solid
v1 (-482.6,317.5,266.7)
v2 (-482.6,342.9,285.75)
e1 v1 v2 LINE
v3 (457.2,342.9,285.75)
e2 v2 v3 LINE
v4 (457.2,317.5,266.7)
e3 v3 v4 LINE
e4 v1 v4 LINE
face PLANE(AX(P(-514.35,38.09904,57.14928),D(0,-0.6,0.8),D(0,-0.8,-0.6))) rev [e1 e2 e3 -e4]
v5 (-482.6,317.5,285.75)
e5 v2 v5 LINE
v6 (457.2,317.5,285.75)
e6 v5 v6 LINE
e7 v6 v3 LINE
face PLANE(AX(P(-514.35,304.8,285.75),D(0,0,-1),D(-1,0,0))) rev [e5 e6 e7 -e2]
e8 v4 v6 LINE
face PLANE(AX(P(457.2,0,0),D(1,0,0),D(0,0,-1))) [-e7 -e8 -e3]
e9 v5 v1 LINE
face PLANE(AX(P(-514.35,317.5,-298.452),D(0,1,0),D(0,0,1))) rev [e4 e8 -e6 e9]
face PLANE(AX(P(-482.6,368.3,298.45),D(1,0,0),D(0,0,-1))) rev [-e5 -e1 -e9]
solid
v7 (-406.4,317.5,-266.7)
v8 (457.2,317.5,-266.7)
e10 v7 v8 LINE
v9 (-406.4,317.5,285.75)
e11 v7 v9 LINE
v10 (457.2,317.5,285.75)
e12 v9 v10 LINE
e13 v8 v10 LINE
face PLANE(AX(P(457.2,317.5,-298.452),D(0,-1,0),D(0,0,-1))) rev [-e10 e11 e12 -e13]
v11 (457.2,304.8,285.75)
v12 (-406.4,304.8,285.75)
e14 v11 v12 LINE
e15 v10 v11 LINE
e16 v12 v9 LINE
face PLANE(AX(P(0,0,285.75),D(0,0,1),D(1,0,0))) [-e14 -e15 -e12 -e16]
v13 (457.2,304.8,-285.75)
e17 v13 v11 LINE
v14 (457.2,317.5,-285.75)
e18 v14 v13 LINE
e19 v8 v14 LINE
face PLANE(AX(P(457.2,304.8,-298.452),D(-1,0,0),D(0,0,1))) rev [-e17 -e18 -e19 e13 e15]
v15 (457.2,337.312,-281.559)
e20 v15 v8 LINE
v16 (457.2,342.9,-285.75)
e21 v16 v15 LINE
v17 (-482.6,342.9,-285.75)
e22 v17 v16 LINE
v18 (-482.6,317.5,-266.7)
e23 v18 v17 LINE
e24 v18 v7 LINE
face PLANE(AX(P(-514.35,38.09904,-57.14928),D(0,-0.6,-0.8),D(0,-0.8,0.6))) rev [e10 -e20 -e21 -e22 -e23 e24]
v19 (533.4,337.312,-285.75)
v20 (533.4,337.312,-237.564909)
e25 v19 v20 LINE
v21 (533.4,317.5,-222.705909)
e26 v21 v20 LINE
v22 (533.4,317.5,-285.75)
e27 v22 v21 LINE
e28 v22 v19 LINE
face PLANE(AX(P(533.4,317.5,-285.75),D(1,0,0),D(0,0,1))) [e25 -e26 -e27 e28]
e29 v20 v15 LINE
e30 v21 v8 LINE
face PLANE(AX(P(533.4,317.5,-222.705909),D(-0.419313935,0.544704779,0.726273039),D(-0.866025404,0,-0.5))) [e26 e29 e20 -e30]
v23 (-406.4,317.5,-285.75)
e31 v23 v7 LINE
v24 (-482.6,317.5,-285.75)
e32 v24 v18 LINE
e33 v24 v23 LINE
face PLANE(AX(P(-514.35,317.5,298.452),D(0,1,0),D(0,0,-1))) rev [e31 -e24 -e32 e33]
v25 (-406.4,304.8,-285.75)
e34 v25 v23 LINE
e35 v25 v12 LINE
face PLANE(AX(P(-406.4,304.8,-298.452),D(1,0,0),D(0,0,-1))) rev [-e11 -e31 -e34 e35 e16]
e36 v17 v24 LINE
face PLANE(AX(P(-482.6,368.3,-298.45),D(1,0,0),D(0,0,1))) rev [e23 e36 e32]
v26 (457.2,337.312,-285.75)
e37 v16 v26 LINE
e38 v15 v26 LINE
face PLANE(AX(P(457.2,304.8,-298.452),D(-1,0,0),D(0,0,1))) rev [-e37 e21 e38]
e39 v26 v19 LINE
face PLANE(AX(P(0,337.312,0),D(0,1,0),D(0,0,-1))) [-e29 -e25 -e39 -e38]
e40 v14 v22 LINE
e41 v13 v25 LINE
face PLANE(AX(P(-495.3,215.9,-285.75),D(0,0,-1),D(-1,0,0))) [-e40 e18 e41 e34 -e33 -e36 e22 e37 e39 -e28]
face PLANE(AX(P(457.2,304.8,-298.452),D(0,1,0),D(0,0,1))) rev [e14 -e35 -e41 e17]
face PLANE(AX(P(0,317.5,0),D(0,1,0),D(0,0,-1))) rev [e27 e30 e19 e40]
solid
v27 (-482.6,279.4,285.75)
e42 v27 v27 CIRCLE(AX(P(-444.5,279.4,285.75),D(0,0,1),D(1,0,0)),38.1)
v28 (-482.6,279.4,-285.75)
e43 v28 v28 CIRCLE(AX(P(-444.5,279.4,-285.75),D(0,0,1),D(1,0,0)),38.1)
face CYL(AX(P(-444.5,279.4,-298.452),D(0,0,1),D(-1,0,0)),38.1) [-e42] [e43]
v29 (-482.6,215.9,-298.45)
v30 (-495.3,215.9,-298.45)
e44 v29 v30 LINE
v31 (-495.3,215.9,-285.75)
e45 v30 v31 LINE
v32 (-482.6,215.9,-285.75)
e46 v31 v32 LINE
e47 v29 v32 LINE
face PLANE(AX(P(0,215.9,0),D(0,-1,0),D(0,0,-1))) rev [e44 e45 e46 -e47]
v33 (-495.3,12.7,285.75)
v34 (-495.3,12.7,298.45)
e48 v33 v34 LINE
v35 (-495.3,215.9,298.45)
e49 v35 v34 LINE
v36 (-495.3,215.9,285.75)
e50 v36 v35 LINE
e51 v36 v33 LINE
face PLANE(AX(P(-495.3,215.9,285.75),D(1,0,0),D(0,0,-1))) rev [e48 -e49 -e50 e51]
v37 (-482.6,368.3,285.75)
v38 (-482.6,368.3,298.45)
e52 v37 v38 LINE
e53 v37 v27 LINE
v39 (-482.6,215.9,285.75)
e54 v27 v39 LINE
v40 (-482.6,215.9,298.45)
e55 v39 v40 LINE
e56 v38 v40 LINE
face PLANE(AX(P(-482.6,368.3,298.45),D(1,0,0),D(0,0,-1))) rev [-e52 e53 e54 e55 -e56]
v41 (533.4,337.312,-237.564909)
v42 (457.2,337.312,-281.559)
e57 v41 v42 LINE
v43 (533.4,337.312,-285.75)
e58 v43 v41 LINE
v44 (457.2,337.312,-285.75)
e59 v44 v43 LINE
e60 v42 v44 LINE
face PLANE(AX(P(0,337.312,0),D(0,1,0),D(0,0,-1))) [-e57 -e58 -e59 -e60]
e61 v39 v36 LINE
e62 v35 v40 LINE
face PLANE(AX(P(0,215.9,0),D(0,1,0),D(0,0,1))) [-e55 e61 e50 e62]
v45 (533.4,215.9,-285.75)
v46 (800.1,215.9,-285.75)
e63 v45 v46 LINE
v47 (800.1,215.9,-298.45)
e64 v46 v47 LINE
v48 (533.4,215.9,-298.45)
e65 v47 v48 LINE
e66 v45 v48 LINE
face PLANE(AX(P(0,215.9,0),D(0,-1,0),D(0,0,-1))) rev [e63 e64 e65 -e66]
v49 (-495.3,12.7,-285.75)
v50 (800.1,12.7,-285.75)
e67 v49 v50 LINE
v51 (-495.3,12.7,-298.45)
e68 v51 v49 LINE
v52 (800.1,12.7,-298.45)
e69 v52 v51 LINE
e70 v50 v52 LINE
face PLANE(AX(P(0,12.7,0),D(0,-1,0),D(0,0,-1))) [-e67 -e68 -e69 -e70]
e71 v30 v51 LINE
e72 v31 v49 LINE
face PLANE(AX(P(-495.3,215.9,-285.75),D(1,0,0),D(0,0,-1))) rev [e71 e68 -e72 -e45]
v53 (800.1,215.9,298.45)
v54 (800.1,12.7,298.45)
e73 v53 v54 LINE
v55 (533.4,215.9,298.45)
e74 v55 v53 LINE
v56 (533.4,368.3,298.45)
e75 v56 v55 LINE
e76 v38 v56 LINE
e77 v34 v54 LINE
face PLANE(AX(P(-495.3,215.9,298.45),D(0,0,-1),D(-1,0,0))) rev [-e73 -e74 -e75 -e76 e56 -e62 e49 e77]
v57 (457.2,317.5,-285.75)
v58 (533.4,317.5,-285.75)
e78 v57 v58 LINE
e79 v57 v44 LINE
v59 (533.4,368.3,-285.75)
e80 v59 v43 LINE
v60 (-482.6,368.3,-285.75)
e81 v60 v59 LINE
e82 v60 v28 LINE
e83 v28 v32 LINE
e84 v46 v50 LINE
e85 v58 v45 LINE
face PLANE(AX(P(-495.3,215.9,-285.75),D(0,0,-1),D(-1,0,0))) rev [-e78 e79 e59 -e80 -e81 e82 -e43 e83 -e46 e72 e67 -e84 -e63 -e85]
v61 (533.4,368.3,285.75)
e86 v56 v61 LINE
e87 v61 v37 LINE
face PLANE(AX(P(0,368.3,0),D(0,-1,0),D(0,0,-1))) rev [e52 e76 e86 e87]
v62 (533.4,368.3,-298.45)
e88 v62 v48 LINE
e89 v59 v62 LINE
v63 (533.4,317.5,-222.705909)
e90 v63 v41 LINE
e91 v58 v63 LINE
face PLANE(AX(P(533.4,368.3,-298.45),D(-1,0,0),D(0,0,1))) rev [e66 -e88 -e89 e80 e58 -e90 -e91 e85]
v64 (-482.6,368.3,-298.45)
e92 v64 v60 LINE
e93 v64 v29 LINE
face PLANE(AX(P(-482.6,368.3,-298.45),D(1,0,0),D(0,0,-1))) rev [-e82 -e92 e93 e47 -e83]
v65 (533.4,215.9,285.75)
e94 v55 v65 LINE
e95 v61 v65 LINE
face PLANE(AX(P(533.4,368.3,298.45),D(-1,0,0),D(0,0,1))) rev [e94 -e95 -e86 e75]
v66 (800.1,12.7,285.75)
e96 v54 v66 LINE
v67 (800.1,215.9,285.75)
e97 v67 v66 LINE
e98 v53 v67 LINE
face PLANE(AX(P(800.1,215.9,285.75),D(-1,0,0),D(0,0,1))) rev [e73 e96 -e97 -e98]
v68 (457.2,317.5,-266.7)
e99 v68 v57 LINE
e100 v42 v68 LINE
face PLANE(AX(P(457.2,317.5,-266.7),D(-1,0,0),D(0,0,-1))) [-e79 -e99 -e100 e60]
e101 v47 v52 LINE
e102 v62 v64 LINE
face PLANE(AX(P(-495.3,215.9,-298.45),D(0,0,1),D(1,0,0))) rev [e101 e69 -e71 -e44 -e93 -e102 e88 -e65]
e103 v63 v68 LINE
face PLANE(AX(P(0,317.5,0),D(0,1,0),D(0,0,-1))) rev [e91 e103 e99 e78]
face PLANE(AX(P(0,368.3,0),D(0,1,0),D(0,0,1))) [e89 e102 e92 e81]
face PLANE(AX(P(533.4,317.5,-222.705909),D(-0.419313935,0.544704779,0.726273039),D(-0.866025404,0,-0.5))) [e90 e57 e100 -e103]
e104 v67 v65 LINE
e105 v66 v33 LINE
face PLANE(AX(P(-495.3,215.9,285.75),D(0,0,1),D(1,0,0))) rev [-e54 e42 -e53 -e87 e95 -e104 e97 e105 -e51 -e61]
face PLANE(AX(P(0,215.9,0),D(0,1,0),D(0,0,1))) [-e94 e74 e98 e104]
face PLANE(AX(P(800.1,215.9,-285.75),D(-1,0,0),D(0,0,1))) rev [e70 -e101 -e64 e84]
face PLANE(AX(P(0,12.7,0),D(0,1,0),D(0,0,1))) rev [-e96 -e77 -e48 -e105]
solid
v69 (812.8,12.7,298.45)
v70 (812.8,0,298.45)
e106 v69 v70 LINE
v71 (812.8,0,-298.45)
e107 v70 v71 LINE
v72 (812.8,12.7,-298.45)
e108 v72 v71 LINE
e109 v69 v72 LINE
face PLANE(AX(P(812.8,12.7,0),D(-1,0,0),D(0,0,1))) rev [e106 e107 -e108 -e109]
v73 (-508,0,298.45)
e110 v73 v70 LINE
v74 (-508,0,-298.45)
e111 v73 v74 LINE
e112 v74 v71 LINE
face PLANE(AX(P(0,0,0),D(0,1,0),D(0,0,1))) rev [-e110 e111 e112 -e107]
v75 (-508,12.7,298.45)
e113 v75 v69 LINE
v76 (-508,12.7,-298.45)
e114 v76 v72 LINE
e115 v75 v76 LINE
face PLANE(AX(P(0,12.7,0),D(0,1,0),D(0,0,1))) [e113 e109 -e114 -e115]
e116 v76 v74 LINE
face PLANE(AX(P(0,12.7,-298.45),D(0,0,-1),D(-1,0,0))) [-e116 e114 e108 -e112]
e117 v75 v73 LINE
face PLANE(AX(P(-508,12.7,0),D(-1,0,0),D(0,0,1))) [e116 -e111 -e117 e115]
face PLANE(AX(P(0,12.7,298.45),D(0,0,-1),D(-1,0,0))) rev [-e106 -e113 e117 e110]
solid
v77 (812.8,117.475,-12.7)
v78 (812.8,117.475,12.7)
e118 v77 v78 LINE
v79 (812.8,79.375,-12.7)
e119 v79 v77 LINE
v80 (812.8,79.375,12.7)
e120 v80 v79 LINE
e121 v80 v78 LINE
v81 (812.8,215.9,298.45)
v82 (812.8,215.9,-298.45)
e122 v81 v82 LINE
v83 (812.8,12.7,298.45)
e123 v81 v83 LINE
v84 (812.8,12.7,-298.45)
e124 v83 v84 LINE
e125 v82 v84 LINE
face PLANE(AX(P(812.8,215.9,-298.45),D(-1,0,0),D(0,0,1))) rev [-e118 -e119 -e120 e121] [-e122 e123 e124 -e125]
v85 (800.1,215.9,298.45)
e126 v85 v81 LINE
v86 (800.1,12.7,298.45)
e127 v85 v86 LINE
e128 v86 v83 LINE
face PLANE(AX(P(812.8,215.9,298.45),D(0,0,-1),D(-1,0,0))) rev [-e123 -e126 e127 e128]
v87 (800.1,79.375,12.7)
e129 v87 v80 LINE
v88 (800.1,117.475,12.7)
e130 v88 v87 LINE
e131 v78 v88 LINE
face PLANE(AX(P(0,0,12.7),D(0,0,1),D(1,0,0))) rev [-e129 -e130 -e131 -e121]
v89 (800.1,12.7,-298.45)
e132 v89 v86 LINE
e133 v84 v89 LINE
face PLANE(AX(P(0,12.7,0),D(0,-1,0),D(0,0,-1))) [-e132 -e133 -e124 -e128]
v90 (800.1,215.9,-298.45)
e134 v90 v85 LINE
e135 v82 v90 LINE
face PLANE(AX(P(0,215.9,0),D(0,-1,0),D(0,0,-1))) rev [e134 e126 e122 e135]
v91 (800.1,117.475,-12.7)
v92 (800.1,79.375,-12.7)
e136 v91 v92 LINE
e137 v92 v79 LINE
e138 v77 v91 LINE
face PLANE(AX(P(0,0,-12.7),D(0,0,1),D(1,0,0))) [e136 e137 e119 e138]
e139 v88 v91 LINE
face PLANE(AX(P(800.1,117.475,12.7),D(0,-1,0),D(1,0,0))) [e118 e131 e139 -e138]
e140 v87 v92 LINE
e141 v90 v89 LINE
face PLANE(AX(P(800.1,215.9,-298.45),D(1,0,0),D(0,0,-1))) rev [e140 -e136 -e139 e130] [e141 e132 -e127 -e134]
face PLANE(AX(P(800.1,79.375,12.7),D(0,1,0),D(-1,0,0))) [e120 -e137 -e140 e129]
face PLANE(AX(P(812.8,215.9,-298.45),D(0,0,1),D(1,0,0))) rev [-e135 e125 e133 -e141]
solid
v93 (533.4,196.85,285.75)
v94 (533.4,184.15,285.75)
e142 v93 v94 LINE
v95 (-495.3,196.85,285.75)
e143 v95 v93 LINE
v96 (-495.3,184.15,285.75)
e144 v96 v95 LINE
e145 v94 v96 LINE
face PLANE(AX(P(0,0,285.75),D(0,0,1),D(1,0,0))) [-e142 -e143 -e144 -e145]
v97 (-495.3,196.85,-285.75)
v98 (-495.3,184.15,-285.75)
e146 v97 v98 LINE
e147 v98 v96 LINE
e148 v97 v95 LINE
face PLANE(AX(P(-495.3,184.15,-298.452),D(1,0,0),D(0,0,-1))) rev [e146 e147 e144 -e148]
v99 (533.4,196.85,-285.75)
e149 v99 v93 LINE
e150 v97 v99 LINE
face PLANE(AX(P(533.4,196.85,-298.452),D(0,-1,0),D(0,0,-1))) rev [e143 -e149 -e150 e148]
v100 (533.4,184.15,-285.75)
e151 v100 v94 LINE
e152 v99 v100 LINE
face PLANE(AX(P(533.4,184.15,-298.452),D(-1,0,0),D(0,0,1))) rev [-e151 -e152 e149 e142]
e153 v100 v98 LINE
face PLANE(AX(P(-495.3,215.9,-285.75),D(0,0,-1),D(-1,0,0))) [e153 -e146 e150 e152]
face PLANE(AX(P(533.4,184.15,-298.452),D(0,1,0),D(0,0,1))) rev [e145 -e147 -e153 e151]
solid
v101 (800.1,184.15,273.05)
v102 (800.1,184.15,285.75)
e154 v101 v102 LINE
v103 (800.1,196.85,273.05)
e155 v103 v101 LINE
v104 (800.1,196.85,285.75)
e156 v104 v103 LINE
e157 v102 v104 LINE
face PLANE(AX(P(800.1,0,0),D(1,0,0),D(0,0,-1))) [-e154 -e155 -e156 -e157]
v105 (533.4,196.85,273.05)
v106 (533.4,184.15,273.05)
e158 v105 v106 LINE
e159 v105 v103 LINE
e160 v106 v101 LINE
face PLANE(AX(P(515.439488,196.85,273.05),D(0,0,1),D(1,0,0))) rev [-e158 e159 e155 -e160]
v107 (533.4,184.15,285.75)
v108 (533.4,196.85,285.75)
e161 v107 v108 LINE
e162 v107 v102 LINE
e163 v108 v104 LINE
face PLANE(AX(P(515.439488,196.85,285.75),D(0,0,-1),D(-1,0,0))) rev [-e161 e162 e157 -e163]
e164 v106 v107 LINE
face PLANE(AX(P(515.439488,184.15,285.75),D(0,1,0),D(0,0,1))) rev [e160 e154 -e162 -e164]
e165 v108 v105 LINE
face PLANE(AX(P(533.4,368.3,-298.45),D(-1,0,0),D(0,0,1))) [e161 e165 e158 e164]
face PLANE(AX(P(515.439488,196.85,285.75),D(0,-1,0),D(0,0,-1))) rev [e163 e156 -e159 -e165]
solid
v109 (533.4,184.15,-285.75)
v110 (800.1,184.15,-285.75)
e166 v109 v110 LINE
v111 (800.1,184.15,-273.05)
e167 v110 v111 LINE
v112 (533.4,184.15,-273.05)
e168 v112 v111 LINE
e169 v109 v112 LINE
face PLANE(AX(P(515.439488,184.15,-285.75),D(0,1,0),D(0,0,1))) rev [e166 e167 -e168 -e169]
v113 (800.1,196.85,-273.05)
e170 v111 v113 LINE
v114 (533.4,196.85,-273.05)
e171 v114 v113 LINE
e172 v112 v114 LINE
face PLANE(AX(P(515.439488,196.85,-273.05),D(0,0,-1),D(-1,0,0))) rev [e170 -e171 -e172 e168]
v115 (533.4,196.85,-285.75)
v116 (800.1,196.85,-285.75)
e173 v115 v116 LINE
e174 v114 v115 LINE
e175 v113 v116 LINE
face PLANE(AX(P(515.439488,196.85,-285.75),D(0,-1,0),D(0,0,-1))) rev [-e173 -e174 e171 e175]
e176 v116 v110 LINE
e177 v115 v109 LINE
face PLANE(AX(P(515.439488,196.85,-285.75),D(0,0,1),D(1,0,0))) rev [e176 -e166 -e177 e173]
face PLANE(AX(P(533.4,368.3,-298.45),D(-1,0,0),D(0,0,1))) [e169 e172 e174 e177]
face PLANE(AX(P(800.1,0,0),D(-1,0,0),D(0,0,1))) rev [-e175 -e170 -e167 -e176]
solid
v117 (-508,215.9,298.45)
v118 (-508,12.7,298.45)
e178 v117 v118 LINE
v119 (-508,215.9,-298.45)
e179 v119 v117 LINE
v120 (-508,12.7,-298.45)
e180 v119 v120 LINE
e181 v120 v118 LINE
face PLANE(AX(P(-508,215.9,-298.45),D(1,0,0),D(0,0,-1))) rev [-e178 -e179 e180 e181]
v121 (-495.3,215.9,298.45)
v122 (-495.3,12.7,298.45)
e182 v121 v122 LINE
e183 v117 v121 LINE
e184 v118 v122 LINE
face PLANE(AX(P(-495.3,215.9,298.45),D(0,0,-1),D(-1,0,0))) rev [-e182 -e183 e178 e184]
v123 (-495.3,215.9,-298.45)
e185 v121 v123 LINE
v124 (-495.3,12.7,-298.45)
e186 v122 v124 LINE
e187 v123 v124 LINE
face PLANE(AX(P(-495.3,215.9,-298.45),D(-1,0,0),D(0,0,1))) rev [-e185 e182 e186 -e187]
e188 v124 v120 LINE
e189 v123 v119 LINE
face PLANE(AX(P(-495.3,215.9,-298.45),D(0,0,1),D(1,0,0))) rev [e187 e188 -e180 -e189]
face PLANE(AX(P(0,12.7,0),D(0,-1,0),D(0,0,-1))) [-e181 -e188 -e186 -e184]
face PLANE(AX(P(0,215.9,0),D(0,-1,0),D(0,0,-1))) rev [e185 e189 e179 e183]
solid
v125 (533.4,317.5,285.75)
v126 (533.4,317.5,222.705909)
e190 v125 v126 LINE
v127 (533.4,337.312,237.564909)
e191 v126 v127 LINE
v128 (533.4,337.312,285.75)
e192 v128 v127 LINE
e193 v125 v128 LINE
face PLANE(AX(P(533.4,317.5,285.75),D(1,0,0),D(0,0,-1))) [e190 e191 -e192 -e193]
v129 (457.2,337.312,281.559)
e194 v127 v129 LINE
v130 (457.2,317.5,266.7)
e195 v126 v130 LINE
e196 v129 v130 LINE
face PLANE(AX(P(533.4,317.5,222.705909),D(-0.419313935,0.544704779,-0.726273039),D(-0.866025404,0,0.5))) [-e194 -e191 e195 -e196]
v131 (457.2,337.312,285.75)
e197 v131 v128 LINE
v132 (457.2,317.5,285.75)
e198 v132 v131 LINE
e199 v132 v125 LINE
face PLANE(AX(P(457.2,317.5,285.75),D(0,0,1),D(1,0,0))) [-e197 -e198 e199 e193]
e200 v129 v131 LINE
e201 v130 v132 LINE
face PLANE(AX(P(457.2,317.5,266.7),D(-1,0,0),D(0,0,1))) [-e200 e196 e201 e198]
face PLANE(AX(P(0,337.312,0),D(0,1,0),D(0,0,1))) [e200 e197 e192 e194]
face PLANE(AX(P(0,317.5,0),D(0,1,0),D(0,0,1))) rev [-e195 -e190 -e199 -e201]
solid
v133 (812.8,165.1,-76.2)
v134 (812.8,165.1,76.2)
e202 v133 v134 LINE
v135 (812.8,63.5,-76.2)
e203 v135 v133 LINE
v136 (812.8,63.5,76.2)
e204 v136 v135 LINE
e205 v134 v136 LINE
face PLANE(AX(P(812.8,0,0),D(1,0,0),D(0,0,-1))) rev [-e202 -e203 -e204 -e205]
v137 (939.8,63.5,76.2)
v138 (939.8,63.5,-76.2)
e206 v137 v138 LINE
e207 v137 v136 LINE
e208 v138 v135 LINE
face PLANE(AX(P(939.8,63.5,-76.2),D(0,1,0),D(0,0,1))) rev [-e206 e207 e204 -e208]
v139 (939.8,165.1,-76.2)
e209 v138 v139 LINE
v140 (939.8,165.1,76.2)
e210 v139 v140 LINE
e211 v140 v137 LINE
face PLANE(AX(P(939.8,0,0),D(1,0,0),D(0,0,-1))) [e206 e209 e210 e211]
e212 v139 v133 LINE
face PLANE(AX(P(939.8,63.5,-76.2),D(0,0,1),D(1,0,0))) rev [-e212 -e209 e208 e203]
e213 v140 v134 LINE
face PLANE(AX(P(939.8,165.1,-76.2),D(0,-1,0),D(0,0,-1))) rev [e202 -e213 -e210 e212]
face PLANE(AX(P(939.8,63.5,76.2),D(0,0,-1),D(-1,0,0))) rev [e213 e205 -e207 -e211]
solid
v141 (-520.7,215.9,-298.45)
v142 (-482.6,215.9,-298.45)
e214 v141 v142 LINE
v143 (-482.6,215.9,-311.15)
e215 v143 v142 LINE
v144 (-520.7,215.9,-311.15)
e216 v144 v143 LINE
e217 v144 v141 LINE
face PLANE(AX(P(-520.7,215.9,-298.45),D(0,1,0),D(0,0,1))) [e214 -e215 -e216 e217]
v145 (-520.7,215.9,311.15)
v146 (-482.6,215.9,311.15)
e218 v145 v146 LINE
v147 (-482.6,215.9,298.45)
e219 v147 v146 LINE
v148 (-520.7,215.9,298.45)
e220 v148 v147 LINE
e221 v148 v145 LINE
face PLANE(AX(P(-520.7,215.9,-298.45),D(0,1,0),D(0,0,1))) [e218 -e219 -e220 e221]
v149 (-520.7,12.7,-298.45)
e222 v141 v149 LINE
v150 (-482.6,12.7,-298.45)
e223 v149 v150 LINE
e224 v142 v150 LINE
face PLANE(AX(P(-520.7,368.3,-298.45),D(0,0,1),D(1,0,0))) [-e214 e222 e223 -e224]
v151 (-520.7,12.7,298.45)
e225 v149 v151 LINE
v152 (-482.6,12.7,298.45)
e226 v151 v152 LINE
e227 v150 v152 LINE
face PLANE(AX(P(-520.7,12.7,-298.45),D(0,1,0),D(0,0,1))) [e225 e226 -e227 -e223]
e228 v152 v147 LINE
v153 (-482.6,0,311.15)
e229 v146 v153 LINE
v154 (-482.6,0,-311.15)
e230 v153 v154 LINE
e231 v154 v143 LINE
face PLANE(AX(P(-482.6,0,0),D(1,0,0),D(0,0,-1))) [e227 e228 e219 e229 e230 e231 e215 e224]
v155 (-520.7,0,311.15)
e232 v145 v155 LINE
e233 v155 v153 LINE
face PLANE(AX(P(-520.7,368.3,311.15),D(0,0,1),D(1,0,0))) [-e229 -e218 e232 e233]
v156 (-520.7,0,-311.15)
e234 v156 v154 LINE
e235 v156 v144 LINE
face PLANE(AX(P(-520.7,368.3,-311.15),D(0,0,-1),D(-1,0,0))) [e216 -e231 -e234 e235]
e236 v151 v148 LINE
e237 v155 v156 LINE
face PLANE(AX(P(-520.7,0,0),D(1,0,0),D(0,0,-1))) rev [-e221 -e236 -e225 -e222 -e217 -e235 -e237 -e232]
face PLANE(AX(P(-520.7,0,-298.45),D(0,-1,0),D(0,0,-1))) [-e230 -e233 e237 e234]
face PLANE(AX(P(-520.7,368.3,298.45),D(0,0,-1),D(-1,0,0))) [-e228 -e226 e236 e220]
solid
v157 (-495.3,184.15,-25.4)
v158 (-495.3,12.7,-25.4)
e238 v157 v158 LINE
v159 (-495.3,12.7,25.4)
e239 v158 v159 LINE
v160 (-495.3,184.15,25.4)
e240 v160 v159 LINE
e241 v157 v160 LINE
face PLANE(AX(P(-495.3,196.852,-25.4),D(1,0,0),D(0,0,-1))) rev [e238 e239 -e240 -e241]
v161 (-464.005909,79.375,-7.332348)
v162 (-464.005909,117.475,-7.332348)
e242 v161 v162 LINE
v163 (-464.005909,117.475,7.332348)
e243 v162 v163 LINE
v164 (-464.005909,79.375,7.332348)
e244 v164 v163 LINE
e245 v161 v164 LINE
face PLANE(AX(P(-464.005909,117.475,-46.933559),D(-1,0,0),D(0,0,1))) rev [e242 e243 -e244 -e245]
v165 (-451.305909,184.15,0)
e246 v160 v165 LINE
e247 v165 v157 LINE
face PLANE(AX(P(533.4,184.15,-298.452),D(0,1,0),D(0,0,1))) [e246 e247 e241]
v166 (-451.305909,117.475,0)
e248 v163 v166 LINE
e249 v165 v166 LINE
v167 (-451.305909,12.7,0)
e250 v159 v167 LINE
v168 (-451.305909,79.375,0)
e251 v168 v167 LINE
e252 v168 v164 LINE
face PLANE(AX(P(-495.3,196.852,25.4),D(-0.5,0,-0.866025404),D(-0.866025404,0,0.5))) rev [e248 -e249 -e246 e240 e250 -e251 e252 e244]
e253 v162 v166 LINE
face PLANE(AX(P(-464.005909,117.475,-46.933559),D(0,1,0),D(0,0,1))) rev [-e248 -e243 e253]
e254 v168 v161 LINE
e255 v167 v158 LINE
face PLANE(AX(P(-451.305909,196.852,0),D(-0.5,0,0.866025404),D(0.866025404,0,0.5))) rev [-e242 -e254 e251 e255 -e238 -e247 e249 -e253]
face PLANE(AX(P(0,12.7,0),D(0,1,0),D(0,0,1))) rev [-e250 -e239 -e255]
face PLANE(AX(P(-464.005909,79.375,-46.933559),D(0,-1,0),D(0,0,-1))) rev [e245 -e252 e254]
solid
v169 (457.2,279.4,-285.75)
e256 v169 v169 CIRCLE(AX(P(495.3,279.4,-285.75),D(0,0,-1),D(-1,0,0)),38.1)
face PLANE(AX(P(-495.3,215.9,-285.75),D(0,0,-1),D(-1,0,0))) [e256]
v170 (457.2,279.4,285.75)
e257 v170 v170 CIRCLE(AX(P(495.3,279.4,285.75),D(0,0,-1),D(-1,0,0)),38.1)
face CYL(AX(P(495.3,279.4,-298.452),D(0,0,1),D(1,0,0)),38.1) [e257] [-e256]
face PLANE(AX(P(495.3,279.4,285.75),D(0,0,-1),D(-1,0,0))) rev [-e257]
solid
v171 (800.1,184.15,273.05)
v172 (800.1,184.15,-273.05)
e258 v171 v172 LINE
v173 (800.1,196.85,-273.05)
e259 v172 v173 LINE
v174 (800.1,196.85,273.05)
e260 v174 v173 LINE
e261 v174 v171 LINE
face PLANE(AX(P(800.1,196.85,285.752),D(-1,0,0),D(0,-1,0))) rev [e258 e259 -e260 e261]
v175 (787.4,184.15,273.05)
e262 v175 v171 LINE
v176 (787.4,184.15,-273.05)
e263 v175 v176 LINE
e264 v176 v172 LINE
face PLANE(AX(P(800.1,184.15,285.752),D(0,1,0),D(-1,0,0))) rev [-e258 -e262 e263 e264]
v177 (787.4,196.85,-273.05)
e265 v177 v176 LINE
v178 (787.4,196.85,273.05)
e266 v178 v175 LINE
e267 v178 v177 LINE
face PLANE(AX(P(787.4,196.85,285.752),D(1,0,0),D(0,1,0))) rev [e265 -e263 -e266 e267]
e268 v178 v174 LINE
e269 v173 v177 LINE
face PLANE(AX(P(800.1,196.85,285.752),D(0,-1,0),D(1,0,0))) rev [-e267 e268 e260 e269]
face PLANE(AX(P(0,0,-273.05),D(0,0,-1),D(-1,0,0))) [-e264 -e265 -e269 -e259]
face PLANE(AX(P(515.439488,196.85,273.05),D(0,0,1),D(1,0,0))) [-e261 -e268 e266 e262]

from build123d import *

# Parameters (mm, degrees)
SKETCH1_W                             = 1016
SKETCH1_H                             = 596.9
SKETCH1_W_2                           = 304.8
FOND_DEPTH                            = 12.7
SKETCH2_W                             = 1295.4
SKETCH2_H                             = 12.7
COT_S_HAUT_DEPTH                      = 203.2
COT_S_HAUT_2_DEPTH                    = 203.2
SKETCH3_W                             = 12.7
SKETCH3_H                             = 596.9
COT_ES_BAS_DEPTH                      = 203.2
COT_ES_BAS_2_DEPTH                    = 203.2
SKETCH4_W                             = 1016
SKETCH4_H                             = 12.7
SUPPORT_CAGE_DEPTH                    = 152.4
SKETCH5_W                             = 12.7
SKETCH5_H                             = 12.7
SUPPORT_TRAPPE_COT_ES_DEPTH           = 266.7
SUPPORT_TRAPPE_COT_ES_2_DEPTH         = 266.7
SUPPORT_TRAPPE_DEVANT_REACH           = 1061.67
SKETCH6_W                             = 12.7
SKETCH6_H                             = 12.7
PLANCHER_MILLIEU_REACH                = 1068.573
SKETCH7_W                             = 1028.7
SKETCH7_H                             = 12.7
ROULEAU_REACH                         = 1068.573
SKETCH8_R                             = 38.1
SKETCH10_W                            = 863.6
SKETCH10_H                            = 12.7
SOUTIEN_TAPIS_DEPTH                   = 571.5
REBORD_START                          = -1016
REBORD_TAPIS_DEPTH                    = 939.8
V_POUR_VIS_SANS_FIN_DEPTH             = 171.45
SKETCH14_W                            = 152.4
SKETCH14_H                            = 101.6
MOTEUR_VIS_SANS_FIN_DEPTH             = 127
TROU_V_VIS_SANS_FIN_REACH             = 1054.588
SKETCH17_W                            = 12.7
SKETCH17_H                            = 38.1
TROU_V_VIS_SANS_FIN_DIRECTION_2_REACH = 1054.588
TROU_SORTIE_VIS_SANS_FIN_DEPTH        = 12.7
TROU_SORTIE_VIS_SANS_FIN_DEPTH_BACK   = 12.7
SKETCH18_W                            = 127
SKETCH18_H                            = 38.1
REBORD_START_2                        = -25.4
REBORD_POUR_SAC_POUBELLE_DEPTH        = 38.1


with BuildPart() as part:
    # Sketch1 → Fond (new body)
    with BuildSketch(Plane(origin=(0, 0, 0), x_dir=(1, 0, 0), z_dir=(0, 1, 0))):
        Rectangle(SKETCH1_W, SKETCH1_H)
        with Locations((660.4, 0)):
            Rectangle(SKETCH1_W_2, SKETCH1_H)
    extrude(amount=FOND_DEPTH)


with BuildPart() as body_2:
    # Sketch2 → Cotés Haut (new body)
    with BuildSketch(Plane(origin=(0, 12.7, 0), x_dir=(1, 0, 0), z_dir=(0, 1, 0))):
        with Locations((152.4, 292.1)):
            Rectangle(SKETCH2_W, SKETCH2_H)
    extrude(amount=COT_S_HAUT_DEPTH)



with BuildPart() as body_3:
    # Sketch2 → Cot_s Haut 2 (new body)
    with BuildSketch(Plane(origin=(0, 12.7, 0), x_dir=(1, 0, 0), z_dir=(0, 1, 0))):
        with Locations((152.4, -292.1)):
            Rectangle(SKETCH2_W, SKETCH2_H)
    extrude(amount=COT_S_HAUT_2_DEPTH)


with BuildPart() as body_4:
    # Sketch3 → Cotées Bas (new body)
    with BuildSketch(Plane(origin=(0, 12.7, 0), x_dir=(1, 0, 0), z_dir=(0, 1, 0))):
        with Locations((-501.65, 0)):
            Rectangle(SKETCH3_W, SKETCH3_H)
    extrude(amount=COT_ES_BAS_DEPTH)


with BuildPart() as body_5:
    # Sketch3 → Cot_es Bas 2 (new body)
    with BuildSketch(Plane(origin=(0, 12.7, 0), x_dir=(1, 0, 0), z_dir=(0, 1, 0))):
        with Locations((806.45, 0)):
            Rectangle(SKETCH3_W, SKETCH3_H)
    extrude(amount=COT_ES_BAS_2_DEPTH)

    # Sketch18 → Trou sortie vis sans fin (cut, two sides: drawn at the far end of the back side and taken through both)
    with BuildSketch(Plane.XY.offset(-TROU_SORTIE_VIS_SANS_FIN_DEPTH_BACK)):
        with Locations((863.6, 98.425)):
            Rectangle(SKETCH18_W, SKETCH18_H)
    extrude(amount=TROU_SORTIE_VIS_SANS_FIN_DEPTH + TROU_SORTIE_VIS_SANS_FIN_DEPTH_BACK, mode=Mode.SUBTRACT)


with BuildPart() as body_2_1:
    add(body_2.part)

    add(body_3.part)  # Support Cage merges body 3
    # Sketch4 → Support Cage (add)
    with BuildSketch(Plane(origin=(0, 215.9, 0), x_dir=(1, 0, 0), z_dir=(0, 1, 0))):
        with Locations((25.4, 292.1)):
            Rectangle(SKETCH4_W, SKETCH4_H)
        with Locations((25.4, -292.1)):
            Rectangle(SKETCH4_W, SKETCH4_H)
    extrude(amount=SUPPORT_CAGE_DEPTH)


with BuildPart() as body_5_2:
    # Sketch5 → Support Trappe cotées (new body)
    with BuildSketch(Plane.ZY.offset(-800.1)):
        with Locations((-279.4, 190.5)):
            Rectangle(SKETCH5_W, SKETCH5_H)
    extrude(amount=SUPPORT_TRAPPE_COT_ES_DEPTH)


with BuildPart() as body_6:
    # Sketch5 → Support Trappe cot_es 2 (new body)
    with BuildSketch(Plane.ZY.offset(-800.1)):
        with Locations((279.4, 190.5)):
            Rectangle(SKETCH5_W, SKETCH5_H)
    extrude(amount=SUPPORT_TRAPPE_COT_ES_2_DEPTH)


with BuildPart() as body_7:

    # Sketch6 → Support Trappe devant (new, up to next)
    with BuildSketch(Plane.XY.offset(-273.05), mode=Mode.PRIVATE) as support_trappe_devant_sk1:
        with Locations((793.75, 190.5)):
            Rectangle(SKETCH6_W, SKETCH6_H)
    support_trappe_devant_tool1 = extrude(support_trappe_devant_sk1.sketch, amount=SUPPORT_TRAPPE_DEVANT_REACH, mode=Mode.PRIVATE) - body_6.part
    add(support_trappe_devant_tool1.solids().sort_by_distance((793.75, 190.5, -273.05))[0])


with BuildPart() as body_8:

    # Sketch7 → Plancher millieu (new, up to next)
    with BuildSketch(Plane(origin=(0, 0, 285.75), x_dir=(-1, 0, 0), z_dir=(0, 0, -1)), mode=Mode.PRIVATE) as plancher_millieu_sk1:
        with Locations((-19.05, 190.5)):
            Rectangle(SKETCH7_W, SKETCH7_H)
    plancher_millieu_tool1 = extrude(plancher_millieu_sk1.sketch, amount=PLANCHER_MILLIEU_REACH, mode=Mode.PRIVATE) - body_2_1.part
    add(plancher_millieu_tool1.solids().sort_by_distance((19.05, 190.5, 285.75))[0])


with BuildPart() as body_9:

    # Sketch8 → Rouleau (new, up to next)
    with BuildSketch(Plane(origin=(0, 0, 285.75), x_dir=(-1, 0, 0), z_dir=(0, 0, -1)), mode=Mode.PRIVATE) as rouleau_sk1:
        with Locations((-495.3, 279.4)):
            Circle(SKETCH8_R)
    rouleau_tool1 = extrude(rouleau_sk1.sketch, amount=ROULEAU_REACH, mode=Mode.PRIVATE) - body_2_1.part
    rouleau = rouleau_tool1.solids().sort_by_distance((495.3, 279.4, 285.75))[0]
    add(rouleau)


with BuildPart() as body_2_2:
    add(body_2_1.part)

    # Mirror1: Rouleau across plane
    add(rouleau.mirror(Plane(origin=(25.4, 0, 0), x_dir=(0, 0, 1), z_dir=(1, 0, 0))))

    # Mirror9 2: loft between two sections, ruled curve by curve
    mirror9_2_from = [
        Edge.make_line((533.4, 337.312, -237.564909488), (533.4, 337.312, -285.75)),
        Edge.make_line((533.4, 317.5, -285.75), (533.4, 317.5, -222.705909488)),
        Edge.make_line((533.4, 317.5, -222.705909488), (533.4, 337.312, -237.564909488)),
        Edge.make_line((533.4, 317.5, -285.75), (533.4, 337.312, -285.75)),
    ]
    mirror9_2_to = [
        Edge.make_line((457.2, 337.312, -281.559), (457.2, 337.312, -285.75)),
        Edge.make_line((457.2, 317.5, -285.75), (457.2, 317.5, -266.7)),
        Edge.make_line((457.2, 317.5, -266.7), (457.2, 337.312, -281.559)),
        Edge.make_line((457.2, 317.5, -285.75), (457.2, 337.312, -285.75)),
    ]
    mirror9_2 = Solid(Shell([*[Face.make_surface_from_curves(mirror9_2_from[k], mirror9_2_to[k]) for k in range(4)], Face(Wire(mirror9_2_from)), Face(Wire(mirror9_2_to))]))
    add(mirror9_2)


with BuildPart() as body_10:
    # Sketch10 → Soutien tapis (new body)
    with BuildSketch(Plane(origin=(0, 0, 285.75), x_dir=(-1, 0, 0), z_dir=(0, 0, -1))):
        with Locations((-25.4, 311.15)):
            Rectangle(SKETCH10_W, SKETCH10_H)
    extrude(amount=SOUTIEN_TAPIS_DEPTH)


with BuildPart() as body_11:
    # Rebord tapis: read off the stored shape, not the designer's step
    # Rebord tapis outline → Rebord tapis (new body)
    with BuildSketch(Plane(origin=(533.4, 0, 0), x_dir=(0, 0, -1), z_dir=(1, 0, 0)).offset(REBORD_START)):
        Polygon((-285.75, 317.5), (-266.7, 317.5), (-285.75, 342.9), align=None)
    rebord_tapis = extrude(amount=REBORD_TAPIS_DEPTH)


with BuildPart() as body_10_1:
    add(body_10.part)

    # Mirror5: Rebord tapis across plane
    add(rebord_tapis.mirror(Plane.XY))

    # Mirror9: read off the stored shape, not the designer's step
    # Mirror9: loft between two sections, ruled curve by curve
    mirror9_from = [
        Edge.make_line((533.4, 317.5, -285.75), (533.4, 317.5, -222.705909488)),
        Edge.make_line((533.4, 337.312, -237.564909488), (533.4, 337.312, -285.75)),
        Edge.make_line((533.4, 317.5, -222.705909488), (533.4, 337.312, -237.564909488)),
        Edge.make_line((533.4, 337.312, -285.75), (533.4, 317.5, -285.75)),
    ]
    mirror9_to = [
        Edge.make_line((457.2, 317.5, -285.75), (457.2, 317.5, -266.7)),
        Edge.make_line((457.2, 337.312, -281.559), (457.2, 337.312, -285.75)),
        Edge.make_line((457.2, 317.5, -266.7), (457.2, 337.312, -281.559)),
        Edge.make_line((457.2, 337.312, -285.75), (457.2, 317.5, -285.75)),
    ]
    mirror9 = Solid(Shell([*[Face.make_surface_from_curves(mirror9_from[k], mirror9_to[k]) for k in range(4)], Face(Wire(mirror9_from)), Face(Wire(mirror9_to))]))
    add(mirror9)


with BuildPart() as body_12:
    # Sketch13 → V pour vis sans fin (new body)
    with BuildSketch(Plane(origin=(0, 12.7, 0), x_dir=(1, 0, 0), z_dir=(0, 1, 0))):
        Polygon((-451.305909488, 0), (-495.3, 25.4), (-495.3, -25.4), align=None)
    extrude(amount=V_POUR_VIS_SANS_FIN_DEPTH)

    # Trou V vis sans fin: up to this face of the body (flat: up to its plane)
    trou_v_vis_sans_fin_end = Plane(body_12.part.faces().sort_by_distance((-473.302954744, 98.425, -12.7))[0])
    # Sketch17 → Trou V vis sans fin (cut, up to the picked face)
    with BuildSketch(Plane.XY, mode=Mode.PRIVATE) as trou_v_vis_sans_fin_sk1:
        with Locations((-457.655909488, 98.425)):
            Rectangle(SKETCH17_W, SKETCH17_H)
    trou_v_vis_sans_fin_tool1 = split(extrude(trou_v_vis_sans_fin_sk1.sketch, amount=-TROU_V_VIS_SANS_FIN_REACH, mode=Mode.PRIVATE), bisect_by=trou_v_vis_sans_fin_end, keep=Keep.BOTH, mode=Mode.PRIVATE)
    add(trou_v_vis_sans_fin_tool1.solids().sort_by(Axis((-457.655909, 98.425, 0), (0, 0, -1)))[0], mode=Mode.SUBTRACT)

    # Trou V vis sans fin direction 2: up to this face of the body (flat: up to its plane)
    trou_v_vis_sans_fin_direction_2_end = Plane(body_12.part.faces().sort_by_distance((-473.302954744, 98.425, 12.7))[0])
    # Sketch17 → Trou V vis sans fin direction 2 (cut, up to the picked face)
    with BuildSketch(Plane.XY, mode=Mode.PRIVATE) as trou_v_vis_sans_fin_direction_2_sk1:
        with Locations((-457.655909488, 98.425)):
            Rectangle(SKETCH17_W, SKETCH17_H)
    trou_v_vis_sans_fin_direction_2_tool1 = split(extrude(trou_v_vis_sans_fin_direction_2_sk1.sketch, amount=TROU_V_VIS_SANS_FIN_DIRECTION_2_REACH, mode=Mode.PRIVATE), bisect_by=trou_v_vis_sans_fin_direction_2_end, keep=Keep.BOTH, mode=Mode.PRIVATE)
    add(trou_v_vis_sans_fin_direction_2_tool1.solids().sort_by(Axis((-457.655909, 98.425, 0), (0, 0, 1)))[0], mode=Mode.SUBTRACT)


with BuildPart() as body_13:
    # Sketch14 → Moteur vis sans fin (new body)
    with BuildSketch(Plane(origin=(812.8, 0, 0), x_dir=(0, 0, -1), z_dir=(1, 0, 0))):
        with Locations((0, 114.3)):
            Rectangle(SKETCH14_W, SKETCH14_H)
    extrude(amount=MOTEUR_VIS_SANS_FIN_DEPTH)


with BuildPart() as body_14:
    # Sketch19 → Rebord pour sac poubelle (new body)
    with BuildSketch(Plane.ZY.offset(508).offset(REBORD_START_2)):
        Polygon((298.45, 215.9), (311.15, 215.9), (311.15, 0), (298.45, 0), (-298.45, 0), (-311.15, 0), (-311.15, 215.9), (-298.45, 215.9), (-298.45, 12.7), (298.45, 12.7), align=None)
    extrude(amount=REBORD_POUR_SAC_POUBELLE_DEPTH)


with BuildPart() as body_15:
    # Sweep7: read off the stored shape, not the designer's step
    # Sweep7: loft between two sections, ruled curve by curve
    sweep7_from = [
        Edge.make_line((457.2, 317.5, 266.7), (457.2, 317.5, 285.75)),
        Edge.make_line((457.2, 317.5, 285.75), (533.4, 317.5, 285.75)),
        Edge.make_line((533.4, 317.5, 222.705909488), (457.2, 317.5, 266.7)),
        Edge.make_line((533.4, 317.5, 285.75), (533.4, 317.5, 222.705909488)),
    ]
    sweep7_to = [
        Edge.make_line((457.2, 337.312, 281.559), (457.2, 337.312, 285.75)),
        Edge.make_line((457.2, 337.312, 285.75), (533.4, 337.312, 285.75)),
        Edge.make_line((533.4, 337.312, 237.564909488), (457.2, 337.312, 281.559)),
        Edge.make_line((533.4, 337.312, 285.75), (533.4, 337.312, 237.564909488)),
    ]
    sweep7 = Solid(Shell([*[Face.make_surface_from_curves(sweep7_from[k], sweep7_to[k]) for k in range(4)], Face(Wire(sweep7_from)), Face(Wire(sweep7_to))]))
    add(sweep7)


solid = Compound([part.part, body_4.part, body_5.part, body_5_2.part, body_6.part, body_7.part, body_8.part, body_9.part, body_2_2.part, body_11.part, body_10_1.part, body_12.part, body_13.part, body_14.part, body_15.part])
